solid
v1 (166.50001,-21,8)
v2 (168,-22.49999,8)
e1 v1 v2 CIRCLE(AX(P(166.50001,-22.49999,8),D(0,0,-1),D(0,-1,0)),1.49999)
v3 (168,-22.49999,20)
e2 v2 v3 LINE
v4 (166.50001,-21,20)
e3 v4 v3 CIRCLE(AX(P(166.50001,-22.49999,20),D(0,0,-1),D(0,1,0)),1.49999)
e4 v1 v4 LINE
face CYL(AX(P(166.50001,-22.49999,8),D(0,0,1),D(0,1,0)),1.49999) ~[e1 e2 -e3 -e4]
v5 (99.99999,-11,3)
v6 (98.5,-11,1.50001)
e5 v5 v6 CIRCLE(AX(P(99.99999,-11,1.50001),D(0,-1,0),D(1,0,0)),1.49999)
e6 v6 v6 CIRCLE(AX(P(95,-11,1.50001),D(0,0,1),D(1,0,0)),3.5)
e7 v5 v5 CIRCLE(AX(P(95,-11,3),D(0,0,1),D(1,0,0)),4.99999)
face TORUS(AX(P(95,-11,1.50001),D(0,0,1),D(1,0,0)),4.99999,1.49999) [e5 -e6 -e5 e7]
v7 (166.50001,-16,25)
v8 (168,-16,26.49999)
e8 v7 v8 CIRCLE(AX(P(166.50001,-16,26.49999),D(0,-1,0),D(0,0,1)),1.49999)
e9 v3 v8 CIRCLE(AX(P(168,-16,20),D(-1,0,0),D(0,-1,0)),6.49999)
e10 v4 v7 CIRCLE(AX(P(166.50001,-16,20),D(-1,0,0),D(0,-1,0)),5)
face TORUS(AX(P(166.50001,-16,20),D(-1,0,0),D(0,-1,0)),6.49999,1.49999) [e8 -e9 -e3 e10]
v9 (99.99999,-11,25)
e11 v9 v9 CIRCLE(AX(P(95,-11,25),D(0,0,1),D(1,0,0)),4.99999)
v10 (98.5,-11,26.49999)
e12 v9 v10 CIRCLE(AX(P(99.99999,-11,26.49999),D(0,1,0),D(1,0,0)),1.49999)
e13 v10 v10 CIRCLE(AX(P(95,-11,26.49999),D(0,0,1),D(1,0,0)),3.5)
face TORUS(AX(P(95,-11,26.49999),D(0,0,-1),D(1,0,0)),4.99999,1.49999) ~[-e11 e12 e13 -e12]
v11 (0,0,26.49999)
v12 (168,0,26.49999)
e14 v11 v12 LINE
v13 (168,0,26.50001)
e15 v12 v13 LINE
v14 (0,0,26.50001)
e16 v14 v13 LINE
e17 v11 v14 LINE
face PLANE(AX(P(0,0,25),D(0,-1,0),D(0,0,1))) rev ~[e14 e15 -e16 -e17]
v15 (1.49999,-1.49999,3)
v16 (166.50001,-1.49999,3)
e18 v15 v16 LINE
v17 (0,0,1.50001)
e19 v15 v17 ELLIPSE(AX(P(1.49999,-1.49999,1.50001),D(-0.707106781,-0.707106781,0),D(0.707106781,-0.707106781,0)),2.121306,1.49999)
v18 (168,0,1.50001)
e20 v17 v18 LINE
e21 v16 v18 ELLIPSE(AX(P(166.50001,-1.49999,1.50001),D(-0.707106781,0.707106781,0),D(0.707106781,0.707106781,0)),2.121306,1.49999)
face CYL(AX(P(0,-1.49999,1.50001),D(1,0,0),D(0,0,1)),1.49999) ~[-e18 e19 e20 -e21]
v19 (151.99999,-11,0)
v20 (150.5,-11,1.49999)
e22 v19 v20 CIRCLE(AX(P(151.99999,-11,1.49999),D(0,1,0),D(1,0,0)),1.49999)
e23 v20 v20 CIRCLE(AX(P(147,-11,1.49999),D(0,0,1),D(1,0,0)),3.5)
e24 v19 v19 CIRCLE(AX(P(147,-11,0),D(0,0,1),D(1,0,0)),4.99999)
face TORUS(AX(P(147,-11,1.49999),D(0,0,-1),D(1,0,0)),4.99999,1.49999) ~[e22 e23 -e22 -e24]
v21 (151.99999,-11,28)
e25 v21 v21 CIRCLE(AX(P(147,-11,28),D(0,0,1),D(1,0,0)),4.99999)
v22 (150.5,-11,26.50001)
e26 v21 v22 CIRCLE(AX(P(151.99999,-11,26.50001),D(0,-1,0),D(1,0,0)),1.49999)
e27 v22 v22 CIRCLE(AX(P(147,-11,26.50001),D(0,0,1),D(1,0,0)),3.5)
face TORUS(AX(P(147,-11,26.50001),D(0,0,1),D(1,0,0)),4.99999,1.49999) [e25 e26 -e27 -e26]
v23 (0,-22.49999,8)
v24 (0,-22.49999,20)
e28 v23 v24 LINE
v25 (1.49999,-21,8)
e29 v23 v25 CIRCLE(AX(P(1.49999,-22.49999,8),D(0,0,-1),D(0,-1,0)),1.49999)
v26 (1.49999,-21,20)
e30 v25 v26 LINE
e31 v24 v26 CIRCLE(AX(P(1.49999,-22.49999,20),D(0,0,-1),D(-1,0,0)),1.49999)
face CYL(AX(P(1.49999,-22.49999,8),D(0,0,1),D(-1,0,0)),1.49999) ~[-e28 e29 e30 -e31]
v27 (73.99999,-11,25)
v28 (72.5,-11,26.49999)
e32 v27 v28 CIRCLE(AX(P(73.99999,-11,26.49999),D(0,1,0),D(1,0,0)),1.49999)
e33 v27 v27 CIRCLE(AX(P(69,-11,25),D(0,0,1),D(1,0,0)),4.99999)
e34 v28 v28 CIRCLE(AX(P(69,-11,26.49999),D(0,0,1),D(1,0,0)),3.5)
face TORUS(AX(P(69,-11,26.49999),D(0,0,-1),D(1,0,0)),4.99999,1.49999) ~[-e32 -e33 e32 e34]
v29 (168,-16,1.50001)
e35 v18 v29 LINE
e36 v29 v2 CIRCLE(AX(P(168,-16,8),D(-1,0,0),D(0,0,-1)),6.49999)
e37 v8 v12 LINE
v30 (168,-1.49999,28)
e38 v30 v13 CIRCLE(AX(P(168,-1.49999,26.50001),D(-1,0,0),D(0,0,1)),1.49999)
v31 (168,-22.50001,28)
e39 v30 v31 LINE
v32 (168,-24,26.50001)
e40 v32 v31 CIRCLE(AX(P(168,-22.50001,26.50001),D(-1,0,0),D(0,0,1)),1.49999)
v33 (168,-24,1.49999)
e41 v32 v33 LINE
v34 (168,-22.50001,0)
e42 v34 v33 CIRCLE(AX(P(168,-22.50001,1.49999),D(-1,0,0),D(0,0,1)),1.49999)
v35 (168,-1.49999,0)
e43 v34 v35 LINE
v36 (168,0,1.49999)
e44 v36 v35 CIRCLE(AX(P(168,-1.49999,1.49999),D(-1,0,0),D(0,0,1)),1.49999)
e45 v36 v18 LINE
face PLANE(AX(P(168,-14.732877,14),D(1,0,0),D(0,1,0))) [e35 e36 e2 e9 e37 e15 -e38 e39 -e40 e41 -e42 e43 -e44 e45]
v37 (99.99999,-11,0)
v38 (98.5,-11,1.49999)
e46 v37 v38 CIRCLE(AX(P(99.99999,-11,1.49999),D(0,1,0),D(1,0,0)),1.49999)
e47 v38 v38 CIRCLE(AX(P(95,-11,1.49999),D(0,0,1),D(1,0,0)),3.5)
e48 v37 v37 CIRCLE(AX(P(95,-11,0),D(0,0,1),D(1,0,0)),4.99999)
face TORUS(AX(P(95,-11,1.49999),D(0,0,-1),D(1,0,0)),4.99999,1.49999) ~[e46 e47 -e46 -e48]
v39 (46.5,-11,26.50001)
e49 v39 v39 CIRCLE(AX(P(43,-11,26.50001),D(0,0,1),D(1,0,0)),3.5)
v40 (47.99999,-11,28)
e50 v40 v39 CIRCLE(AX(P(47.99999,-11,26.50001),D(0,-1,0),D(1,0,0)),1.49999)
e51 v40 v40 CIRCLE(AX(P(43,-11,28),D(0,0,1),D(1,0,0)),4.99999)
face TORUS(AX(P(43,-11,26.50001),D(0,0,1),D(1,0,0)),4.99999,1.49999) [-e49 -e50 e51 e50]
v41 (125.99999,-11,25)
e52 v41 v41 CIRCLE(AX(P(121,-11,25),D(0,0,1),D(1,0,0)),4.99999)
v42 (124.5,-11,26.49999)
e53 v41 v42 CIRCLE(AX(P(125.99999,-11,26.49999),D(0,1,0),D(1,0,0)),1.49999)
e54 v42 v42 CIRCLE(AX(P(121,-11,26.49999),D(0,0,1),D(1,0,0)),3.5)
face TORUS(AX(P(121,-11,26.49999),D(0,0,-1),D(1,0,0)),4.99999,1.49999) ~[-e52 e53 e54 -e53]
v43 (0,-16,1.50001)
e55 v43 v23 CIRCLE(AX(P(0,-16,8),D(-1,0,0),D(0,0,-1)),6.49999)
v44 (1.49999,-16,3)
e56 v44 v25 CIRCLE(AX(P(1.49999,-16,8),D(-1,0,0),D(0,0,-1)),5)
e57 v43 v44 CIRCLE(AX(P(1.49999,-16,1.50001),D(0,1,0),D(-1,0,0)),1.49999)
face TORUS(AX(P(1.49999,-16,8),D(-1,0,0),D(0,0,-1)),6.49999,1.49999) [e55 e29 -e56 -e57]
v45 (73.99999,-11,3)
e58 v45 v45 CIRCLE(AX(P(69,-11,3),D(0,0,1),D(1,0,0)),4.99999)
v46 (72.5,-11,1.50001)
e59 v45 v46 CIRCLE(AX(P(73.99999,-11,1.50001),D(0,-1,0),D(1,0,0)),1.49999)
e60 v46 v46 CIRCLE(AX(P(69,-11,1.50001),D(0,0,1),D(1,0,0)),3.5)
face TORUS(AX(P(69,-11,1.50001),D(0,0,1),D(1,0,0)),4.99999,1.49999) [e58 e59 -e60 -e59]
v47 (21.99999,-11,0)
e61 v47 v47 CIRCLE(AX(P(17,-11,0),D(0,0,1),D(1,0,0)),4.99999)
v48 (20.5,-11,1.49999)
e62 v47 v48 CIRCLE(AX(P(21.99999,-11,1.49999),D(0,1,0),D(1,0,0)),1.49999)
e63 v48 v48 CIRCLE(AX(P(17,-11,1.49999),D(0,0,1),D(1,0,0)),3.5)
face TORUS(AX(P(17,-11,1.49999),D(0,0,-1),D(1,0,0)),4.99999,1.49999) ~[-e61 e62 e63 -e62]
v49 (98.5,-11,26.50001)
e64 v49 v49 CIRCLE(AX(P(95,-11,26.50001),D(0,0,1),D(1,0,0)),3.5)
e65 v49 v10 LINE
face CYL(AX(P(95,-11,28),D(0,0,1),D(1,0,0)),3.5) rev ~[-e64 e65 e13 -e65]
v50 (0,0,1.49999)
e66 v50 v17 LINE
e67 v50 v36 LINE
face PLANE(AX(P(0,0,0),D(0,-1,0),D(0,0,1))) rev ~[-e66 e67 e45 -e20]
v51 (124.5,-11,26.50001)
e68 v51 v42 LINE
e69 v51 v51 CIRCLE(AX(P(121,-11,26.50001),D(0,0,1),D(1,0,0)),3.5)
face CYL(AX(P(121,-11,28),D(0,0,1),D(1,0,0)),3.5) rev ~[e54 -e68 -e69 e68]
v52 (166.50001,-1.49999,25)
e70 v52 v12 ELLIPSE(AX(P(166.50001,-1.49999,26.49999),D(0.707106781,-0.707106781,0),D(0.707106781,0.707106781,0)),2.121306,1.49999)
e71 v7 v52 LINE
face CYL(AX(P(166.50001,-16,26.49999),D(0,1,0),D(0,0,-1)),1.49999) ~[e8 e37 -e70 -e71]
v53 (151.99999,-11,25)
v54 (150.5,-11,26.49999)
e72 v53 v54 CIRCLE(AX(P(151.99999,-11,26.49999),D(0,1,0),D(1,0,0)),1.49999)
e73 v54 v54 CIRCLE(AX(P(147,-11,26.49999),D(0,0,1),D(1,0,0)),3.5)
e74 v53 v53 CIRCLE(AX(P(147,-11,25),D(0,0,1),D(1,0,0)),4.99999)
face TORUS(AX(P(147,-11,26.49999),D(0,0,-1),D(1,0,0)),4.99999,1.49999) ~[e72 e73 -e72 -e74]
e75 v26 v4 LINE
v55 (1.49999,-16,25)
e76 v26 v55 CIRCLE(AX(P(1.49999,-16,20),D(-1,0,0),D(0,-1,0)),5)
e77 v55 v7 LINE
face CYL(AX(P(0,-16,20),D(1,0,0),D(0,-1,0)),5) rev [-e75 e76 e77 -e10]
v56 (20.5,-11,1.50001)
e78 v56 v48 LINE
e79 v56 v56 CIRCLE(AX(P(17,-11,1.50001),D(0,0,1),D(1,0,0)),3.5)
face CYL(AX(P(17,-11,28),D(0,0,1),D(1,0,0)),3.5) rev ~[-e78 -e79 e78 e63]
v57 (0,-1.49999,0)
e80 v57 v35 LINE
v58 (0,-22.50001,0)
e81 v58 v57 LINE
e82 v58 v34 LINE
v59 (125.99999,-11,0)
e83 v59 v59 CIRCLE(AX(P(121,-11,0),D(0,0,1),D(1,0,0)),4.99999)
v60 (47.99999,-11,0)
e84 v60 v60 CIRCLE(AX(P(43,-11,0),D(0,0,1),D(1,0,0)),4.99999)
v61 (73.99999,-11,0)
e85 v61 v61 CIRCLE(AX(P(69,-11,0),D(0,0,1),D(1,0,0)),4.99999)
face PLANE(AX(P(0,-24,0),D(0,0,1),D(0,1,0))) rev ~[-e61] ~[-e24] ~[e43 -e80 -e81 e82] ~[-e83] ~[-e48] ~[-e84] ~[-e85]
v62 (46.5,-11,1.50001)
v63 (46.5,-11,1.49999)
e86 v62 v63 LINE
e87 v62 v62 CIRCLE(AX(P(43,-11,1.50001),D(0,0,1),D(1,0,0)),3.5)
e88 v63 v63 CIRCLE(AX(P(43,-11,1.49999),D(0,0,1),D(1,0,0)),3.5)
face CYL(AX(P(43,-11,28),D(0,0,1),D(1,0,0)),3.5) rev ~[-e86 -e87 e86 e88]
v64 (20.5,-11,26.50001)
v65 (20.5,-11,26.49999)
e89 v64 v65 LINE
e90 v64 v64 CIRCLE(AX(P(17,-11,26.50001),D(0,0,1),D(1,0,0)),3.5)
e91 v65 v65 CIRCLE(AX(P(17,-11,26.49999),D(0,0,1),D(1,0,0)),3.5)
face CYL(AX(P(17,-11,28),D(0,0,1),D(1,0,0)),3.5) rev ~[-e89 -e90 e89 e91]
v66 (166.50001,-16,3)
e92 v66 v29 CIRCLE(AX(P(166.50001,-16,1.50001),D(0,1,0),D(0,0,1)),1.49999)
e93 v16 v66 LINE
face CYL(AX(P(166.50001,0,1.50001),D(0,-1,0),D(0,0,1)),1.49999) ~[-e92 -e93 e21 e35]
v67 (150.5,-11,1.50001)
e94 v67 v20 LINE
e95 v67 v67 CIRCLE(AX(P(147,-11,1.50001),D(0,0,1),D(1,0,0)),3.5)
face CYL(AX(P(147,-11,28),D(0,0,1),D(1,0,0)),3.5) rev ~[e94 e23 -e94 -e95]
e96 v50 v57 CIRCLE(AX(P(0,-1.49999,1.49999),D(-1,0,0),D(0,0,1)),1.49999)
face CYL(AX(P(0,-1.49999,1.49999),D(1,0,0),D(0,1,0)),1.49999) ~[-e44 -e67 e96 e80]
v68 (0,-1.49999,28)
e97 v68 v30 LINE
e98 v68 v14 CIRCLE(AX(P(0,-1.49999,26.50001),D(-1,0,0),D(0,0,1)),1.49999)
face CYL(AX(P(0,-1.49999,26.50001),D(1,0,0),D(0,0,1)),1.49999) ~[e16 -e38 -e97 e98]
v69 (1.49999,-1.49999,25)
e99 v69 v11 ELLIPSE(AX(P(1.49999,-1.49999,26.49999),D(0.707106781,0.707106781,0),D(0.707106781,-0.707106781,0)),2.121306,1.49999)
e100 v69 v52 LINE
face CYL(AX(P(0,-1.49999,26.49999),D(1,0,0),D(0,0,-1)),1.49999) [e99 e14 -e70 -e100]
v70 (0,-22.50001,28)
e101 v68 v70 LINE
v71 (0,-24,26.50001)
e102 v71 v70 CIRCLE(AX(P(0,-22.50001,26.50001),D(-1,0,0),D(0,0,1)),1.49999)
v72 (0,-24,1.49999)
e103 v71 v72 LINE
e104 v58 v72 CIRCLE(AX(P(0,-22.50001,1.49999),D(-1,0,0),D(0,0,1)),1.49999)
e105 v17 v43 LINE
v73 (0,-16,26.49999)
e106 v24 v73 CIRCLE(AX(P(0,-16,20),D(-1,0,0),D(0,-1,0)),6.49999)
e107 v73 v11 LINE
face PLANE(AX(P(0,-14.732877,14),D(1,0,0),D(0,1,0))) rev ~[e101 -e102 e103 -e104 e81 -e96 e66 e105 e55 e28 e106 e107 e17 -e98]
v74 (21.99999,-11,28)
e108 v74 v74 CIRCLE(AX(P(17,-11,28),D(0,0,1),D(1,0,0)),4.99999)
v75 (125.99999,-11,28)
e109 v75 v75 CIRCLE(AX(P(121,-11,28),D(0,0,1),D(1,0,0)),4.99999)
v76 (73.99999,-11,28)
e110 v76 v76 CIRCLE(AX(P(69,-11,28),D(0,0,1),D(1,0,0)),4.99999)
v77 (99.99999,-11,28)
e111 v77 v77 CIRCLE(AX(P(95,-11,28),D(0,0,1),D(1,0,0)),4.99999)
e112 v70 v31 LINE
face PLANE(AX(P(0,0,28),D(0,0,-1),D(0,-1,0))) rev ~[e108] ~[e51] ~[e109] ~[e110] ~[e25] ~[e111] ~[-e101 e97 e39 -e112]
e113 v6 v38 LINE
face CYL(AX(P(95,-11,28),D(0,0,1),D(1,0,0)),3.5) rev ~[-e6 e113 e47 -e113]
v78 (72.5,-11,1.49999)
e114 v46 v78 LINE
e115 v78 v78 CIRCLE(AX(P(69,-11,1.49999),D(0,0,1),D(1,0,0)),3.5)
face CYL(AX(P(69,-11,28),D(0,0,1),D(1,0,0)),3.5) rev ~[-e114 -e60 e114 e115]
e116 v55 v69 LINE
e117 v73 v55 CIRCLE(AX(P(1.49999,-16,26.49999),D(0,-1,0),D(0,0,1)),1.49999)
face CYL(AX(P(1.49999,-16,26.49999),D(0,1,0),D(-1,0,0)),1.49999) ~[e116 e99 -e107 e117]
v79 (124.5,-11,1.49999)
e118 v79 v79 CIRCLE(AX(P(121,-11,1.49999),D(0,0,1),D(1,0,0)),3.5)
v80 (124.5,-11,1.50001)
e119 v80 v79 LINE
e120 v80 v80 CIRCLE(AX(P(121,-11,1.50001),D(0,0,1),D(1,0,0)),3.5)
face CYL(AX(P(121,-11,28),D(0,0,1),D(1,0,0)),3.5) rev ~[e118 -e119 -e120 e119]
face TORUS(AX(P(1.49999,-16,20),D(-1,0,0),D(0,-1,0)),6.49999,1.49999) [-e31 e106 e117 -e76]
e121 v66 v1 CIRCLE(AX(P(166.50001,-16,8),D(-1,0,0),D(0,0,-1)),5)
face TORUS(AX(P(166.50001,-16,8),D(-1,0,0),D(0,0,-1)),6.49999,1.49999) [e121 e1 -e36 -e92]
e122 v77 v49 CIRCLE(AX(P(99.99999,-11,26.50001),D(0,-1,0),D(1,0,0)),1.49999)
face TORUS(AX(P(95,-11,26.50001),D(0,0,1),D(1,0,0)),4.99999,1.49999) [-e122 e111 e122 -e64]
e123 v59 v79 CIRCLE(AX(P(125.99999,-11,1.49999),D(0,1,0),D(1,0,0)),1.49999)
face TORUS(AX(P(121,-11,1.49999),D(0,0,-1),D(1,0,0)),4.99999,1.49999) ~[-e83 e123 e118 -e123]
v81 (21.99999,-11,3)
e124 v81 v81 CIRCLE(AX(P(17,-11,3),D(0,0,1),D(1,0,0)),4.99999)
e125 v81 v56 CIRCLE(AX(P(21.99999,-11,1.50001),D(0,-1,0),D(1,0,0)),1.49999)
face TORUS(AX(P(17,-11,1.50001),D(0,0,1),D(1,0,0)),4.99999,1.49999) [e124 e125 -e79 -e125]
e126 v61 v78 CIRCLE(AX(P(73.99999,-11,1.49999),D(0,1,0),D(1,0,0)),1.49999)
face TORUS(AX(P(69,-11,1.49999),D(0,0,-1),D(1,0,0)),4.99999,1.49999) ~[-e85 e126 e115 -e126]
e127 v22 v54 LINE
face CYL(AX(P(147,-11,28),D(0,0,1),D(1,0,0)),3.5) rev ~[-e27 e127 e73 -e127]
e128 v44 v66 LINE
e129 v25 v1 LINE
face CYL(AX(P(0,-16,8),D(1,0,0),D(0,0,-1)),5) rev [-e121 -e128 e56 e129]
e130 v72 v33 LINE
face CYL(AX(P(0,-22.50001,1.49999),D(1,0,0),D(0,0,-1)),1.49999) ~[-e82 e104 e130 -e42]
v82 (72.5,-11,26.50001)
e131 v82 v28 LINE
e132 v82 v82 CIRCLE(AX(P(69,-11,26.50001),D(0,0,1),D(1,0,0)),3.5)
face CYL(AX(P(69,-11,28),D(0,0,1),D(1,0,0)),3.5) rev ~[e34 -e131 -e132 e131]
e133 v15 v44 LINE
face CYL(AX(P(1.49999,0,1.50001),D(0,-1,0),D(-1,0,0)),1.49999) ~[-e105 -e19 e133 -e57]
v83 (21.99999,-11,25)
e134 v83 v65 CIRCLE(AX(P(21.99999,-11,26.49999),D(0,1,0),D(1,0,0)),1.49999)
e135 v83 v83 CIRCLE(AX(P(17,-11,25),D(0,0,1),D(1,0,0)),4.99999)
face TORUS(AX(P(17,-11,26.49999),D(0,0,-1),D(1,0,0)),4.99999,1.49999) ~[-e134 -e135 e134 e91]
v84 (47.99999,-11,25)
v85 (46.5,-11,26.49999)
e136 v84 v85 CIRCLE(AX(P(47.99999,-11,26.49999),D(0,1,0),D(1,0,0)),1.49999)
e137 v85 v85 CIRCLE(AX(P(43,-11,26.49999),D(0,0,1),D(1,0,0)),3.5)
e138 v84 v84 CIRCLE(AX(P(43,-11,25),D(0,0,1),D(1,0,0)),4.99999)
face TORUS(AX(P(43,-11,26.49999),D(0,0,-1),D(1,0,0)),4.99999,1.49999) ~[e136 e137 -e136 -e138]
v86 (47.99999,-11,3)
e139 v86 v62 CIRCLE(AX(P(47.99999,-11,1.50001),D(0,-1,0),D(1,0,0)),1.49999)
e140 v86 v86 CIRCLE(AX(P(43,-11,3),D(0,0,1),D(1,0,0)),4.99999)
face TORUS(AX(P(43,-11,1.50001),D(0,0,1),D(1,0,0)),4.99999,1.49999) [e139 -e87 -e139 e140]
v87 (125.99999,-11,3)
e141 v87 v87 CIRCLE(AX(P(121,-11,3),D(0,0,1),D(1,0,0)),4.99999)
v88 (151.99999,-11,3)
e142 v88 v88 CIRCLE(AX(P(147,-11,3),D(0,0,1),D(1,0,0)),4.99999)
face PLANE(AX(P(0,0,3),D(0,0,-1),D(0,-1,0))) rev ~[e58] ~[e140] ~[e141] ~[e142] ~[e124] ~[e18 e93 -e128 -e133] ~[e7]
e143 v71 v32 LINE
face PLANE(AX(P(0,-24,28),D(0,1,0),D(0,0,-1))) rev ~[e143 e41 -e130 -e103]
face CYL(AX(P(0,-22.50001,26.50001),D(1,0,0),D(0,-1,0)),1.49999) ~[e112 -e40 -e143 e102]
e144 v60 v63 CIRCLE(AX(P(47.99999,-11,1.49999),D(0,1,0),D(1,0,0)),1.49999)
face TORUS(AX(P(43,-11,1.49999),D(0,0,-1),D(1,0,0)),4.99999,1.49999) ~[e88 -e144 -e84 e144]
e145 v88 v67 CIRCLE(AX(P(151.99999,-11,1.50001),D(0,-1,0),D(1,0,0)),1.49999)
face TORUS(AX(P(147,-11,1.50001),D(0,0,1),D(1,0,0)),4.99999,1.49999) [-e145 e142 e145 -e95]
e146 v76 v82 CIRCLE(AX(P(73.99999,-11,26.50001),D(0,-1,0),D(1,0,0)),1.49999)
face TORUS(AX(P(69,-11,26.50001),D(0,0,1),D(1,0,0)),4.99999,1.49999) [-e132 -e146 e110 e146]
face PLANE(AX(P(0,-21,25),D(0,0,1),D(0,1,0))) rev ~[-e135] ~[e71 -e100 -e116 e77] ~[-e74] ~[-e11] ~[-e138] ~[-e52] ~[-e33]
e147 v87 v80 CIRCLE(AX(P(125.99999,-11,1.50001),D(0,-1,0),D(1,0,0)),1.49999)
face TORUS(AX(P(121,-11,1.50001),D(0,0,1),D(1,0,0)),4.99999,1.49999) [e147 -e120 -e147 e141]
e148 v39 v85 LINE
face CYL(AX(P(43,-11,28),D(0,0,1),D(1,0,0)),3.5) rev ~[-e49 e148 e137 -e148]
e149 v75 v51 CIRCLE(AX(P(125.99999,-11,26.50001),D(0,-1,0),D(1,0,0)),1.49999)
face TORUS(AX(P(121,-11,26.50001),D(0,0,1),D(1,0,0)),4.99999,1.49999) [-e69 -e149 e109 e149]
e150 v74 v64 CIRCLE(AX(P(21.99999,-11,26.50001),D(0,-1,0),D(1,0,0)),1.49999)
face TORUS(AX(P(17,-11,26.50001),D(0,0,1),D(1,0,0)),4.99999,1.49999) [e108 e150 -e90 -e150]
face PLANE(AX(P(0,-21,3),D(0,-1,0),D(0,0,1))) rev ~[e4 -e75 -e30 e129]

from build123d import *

# Parameters (mm, degrees)
F1_DEPTH = 168
F2_R     = 3.5
F3_DEPTH = 55
F4_R     = 5
F5_R     = 1.49999


# Not quite as in the source:
# - a fillet or chamfer is up to 0.001 mm smaller than in the source, because OpenCascade refuses the exact size


with BuildPart() as f1:
    # F0 (on Right) → F1 (new body)
    with BuildSketch(Plane.YZ):
        Polygon((-24, 0), (0, 0), (0, 3), (-21, 3), (-21, 25), (0, 25), (0, 28), (-24, 28), align=None)
    extrude(amount=F1_DEPTH)

    # F2 (on face) → F3 (cut)
    with BuildSketch(Plane.XY.offset(28)):
        with Locations((17, -11)):
            Circle(F2_R)
        with Locations((43, -11)):
            Circle(F2_R)
        with Locations((69, -11)):
            Circle(F2_R)
        with Locations((95, -11)):
            Circle(F2_R)
        with Locations((121, -11)):
            Circle(F2_R)
        with Locations((147, -11)):
            Circle(F2_R)
    extrude(amount=-F3_DEPTH, mode=Mode.SUBTRACT)

    # F4
    f4_edges = [f1.edges().sort_by_distance(p)[0] for p in [
        (84, -21, 3),
        (84, -21, 25),
    ]]
    fillet(f4_edges, radius=F4_R)

    # F5 (radius 1.5 in the source; OpenCascade refuses exactly that, so slightly less here)
    f5_edges = [f1.edges().sort_by_distance(p)[0] for p in [
        (84, 0, 3),
        (84, 0, 0),
        (84, 0, 28),
        (84, 0, 25),
        (84, -24, 28),
        (84, -24, 0),
        (39.5, -11, 0),
        (13.5, -11, 0),
        (65.5, -11, 0),
        (91.5, -11, 0),
        (117.5, -11, 0),
        (143.5, -11, 0),
        (117.5, -11, 25),
        (91.5, -11, 25),
        (65.5, -11, 25),
        (39.5, -11, 25),
        (0, -8, 25),
        (84, -16, 25),
        (168, -8, 25),
        (143.5, -11, 25),
        (13.5, -11, 25),
        (13.5, -11, 3),
        (39.5, -11, 3),
        (65.5, -11, 3),
        (91.5, -11, 3),
        (117.5, -11, 3),
        (143.5, -11, 3),
        (13.5, -11, 28),
        (39.5, -11, 28),
        (65.5, -11, 28),
        (91.5, -11, 28),
        (117.5, -11, 28),
        (143.5, -11, 28),
    ]]
    fillet(f5_edges, radius=F5_R)


solid = f1.part
